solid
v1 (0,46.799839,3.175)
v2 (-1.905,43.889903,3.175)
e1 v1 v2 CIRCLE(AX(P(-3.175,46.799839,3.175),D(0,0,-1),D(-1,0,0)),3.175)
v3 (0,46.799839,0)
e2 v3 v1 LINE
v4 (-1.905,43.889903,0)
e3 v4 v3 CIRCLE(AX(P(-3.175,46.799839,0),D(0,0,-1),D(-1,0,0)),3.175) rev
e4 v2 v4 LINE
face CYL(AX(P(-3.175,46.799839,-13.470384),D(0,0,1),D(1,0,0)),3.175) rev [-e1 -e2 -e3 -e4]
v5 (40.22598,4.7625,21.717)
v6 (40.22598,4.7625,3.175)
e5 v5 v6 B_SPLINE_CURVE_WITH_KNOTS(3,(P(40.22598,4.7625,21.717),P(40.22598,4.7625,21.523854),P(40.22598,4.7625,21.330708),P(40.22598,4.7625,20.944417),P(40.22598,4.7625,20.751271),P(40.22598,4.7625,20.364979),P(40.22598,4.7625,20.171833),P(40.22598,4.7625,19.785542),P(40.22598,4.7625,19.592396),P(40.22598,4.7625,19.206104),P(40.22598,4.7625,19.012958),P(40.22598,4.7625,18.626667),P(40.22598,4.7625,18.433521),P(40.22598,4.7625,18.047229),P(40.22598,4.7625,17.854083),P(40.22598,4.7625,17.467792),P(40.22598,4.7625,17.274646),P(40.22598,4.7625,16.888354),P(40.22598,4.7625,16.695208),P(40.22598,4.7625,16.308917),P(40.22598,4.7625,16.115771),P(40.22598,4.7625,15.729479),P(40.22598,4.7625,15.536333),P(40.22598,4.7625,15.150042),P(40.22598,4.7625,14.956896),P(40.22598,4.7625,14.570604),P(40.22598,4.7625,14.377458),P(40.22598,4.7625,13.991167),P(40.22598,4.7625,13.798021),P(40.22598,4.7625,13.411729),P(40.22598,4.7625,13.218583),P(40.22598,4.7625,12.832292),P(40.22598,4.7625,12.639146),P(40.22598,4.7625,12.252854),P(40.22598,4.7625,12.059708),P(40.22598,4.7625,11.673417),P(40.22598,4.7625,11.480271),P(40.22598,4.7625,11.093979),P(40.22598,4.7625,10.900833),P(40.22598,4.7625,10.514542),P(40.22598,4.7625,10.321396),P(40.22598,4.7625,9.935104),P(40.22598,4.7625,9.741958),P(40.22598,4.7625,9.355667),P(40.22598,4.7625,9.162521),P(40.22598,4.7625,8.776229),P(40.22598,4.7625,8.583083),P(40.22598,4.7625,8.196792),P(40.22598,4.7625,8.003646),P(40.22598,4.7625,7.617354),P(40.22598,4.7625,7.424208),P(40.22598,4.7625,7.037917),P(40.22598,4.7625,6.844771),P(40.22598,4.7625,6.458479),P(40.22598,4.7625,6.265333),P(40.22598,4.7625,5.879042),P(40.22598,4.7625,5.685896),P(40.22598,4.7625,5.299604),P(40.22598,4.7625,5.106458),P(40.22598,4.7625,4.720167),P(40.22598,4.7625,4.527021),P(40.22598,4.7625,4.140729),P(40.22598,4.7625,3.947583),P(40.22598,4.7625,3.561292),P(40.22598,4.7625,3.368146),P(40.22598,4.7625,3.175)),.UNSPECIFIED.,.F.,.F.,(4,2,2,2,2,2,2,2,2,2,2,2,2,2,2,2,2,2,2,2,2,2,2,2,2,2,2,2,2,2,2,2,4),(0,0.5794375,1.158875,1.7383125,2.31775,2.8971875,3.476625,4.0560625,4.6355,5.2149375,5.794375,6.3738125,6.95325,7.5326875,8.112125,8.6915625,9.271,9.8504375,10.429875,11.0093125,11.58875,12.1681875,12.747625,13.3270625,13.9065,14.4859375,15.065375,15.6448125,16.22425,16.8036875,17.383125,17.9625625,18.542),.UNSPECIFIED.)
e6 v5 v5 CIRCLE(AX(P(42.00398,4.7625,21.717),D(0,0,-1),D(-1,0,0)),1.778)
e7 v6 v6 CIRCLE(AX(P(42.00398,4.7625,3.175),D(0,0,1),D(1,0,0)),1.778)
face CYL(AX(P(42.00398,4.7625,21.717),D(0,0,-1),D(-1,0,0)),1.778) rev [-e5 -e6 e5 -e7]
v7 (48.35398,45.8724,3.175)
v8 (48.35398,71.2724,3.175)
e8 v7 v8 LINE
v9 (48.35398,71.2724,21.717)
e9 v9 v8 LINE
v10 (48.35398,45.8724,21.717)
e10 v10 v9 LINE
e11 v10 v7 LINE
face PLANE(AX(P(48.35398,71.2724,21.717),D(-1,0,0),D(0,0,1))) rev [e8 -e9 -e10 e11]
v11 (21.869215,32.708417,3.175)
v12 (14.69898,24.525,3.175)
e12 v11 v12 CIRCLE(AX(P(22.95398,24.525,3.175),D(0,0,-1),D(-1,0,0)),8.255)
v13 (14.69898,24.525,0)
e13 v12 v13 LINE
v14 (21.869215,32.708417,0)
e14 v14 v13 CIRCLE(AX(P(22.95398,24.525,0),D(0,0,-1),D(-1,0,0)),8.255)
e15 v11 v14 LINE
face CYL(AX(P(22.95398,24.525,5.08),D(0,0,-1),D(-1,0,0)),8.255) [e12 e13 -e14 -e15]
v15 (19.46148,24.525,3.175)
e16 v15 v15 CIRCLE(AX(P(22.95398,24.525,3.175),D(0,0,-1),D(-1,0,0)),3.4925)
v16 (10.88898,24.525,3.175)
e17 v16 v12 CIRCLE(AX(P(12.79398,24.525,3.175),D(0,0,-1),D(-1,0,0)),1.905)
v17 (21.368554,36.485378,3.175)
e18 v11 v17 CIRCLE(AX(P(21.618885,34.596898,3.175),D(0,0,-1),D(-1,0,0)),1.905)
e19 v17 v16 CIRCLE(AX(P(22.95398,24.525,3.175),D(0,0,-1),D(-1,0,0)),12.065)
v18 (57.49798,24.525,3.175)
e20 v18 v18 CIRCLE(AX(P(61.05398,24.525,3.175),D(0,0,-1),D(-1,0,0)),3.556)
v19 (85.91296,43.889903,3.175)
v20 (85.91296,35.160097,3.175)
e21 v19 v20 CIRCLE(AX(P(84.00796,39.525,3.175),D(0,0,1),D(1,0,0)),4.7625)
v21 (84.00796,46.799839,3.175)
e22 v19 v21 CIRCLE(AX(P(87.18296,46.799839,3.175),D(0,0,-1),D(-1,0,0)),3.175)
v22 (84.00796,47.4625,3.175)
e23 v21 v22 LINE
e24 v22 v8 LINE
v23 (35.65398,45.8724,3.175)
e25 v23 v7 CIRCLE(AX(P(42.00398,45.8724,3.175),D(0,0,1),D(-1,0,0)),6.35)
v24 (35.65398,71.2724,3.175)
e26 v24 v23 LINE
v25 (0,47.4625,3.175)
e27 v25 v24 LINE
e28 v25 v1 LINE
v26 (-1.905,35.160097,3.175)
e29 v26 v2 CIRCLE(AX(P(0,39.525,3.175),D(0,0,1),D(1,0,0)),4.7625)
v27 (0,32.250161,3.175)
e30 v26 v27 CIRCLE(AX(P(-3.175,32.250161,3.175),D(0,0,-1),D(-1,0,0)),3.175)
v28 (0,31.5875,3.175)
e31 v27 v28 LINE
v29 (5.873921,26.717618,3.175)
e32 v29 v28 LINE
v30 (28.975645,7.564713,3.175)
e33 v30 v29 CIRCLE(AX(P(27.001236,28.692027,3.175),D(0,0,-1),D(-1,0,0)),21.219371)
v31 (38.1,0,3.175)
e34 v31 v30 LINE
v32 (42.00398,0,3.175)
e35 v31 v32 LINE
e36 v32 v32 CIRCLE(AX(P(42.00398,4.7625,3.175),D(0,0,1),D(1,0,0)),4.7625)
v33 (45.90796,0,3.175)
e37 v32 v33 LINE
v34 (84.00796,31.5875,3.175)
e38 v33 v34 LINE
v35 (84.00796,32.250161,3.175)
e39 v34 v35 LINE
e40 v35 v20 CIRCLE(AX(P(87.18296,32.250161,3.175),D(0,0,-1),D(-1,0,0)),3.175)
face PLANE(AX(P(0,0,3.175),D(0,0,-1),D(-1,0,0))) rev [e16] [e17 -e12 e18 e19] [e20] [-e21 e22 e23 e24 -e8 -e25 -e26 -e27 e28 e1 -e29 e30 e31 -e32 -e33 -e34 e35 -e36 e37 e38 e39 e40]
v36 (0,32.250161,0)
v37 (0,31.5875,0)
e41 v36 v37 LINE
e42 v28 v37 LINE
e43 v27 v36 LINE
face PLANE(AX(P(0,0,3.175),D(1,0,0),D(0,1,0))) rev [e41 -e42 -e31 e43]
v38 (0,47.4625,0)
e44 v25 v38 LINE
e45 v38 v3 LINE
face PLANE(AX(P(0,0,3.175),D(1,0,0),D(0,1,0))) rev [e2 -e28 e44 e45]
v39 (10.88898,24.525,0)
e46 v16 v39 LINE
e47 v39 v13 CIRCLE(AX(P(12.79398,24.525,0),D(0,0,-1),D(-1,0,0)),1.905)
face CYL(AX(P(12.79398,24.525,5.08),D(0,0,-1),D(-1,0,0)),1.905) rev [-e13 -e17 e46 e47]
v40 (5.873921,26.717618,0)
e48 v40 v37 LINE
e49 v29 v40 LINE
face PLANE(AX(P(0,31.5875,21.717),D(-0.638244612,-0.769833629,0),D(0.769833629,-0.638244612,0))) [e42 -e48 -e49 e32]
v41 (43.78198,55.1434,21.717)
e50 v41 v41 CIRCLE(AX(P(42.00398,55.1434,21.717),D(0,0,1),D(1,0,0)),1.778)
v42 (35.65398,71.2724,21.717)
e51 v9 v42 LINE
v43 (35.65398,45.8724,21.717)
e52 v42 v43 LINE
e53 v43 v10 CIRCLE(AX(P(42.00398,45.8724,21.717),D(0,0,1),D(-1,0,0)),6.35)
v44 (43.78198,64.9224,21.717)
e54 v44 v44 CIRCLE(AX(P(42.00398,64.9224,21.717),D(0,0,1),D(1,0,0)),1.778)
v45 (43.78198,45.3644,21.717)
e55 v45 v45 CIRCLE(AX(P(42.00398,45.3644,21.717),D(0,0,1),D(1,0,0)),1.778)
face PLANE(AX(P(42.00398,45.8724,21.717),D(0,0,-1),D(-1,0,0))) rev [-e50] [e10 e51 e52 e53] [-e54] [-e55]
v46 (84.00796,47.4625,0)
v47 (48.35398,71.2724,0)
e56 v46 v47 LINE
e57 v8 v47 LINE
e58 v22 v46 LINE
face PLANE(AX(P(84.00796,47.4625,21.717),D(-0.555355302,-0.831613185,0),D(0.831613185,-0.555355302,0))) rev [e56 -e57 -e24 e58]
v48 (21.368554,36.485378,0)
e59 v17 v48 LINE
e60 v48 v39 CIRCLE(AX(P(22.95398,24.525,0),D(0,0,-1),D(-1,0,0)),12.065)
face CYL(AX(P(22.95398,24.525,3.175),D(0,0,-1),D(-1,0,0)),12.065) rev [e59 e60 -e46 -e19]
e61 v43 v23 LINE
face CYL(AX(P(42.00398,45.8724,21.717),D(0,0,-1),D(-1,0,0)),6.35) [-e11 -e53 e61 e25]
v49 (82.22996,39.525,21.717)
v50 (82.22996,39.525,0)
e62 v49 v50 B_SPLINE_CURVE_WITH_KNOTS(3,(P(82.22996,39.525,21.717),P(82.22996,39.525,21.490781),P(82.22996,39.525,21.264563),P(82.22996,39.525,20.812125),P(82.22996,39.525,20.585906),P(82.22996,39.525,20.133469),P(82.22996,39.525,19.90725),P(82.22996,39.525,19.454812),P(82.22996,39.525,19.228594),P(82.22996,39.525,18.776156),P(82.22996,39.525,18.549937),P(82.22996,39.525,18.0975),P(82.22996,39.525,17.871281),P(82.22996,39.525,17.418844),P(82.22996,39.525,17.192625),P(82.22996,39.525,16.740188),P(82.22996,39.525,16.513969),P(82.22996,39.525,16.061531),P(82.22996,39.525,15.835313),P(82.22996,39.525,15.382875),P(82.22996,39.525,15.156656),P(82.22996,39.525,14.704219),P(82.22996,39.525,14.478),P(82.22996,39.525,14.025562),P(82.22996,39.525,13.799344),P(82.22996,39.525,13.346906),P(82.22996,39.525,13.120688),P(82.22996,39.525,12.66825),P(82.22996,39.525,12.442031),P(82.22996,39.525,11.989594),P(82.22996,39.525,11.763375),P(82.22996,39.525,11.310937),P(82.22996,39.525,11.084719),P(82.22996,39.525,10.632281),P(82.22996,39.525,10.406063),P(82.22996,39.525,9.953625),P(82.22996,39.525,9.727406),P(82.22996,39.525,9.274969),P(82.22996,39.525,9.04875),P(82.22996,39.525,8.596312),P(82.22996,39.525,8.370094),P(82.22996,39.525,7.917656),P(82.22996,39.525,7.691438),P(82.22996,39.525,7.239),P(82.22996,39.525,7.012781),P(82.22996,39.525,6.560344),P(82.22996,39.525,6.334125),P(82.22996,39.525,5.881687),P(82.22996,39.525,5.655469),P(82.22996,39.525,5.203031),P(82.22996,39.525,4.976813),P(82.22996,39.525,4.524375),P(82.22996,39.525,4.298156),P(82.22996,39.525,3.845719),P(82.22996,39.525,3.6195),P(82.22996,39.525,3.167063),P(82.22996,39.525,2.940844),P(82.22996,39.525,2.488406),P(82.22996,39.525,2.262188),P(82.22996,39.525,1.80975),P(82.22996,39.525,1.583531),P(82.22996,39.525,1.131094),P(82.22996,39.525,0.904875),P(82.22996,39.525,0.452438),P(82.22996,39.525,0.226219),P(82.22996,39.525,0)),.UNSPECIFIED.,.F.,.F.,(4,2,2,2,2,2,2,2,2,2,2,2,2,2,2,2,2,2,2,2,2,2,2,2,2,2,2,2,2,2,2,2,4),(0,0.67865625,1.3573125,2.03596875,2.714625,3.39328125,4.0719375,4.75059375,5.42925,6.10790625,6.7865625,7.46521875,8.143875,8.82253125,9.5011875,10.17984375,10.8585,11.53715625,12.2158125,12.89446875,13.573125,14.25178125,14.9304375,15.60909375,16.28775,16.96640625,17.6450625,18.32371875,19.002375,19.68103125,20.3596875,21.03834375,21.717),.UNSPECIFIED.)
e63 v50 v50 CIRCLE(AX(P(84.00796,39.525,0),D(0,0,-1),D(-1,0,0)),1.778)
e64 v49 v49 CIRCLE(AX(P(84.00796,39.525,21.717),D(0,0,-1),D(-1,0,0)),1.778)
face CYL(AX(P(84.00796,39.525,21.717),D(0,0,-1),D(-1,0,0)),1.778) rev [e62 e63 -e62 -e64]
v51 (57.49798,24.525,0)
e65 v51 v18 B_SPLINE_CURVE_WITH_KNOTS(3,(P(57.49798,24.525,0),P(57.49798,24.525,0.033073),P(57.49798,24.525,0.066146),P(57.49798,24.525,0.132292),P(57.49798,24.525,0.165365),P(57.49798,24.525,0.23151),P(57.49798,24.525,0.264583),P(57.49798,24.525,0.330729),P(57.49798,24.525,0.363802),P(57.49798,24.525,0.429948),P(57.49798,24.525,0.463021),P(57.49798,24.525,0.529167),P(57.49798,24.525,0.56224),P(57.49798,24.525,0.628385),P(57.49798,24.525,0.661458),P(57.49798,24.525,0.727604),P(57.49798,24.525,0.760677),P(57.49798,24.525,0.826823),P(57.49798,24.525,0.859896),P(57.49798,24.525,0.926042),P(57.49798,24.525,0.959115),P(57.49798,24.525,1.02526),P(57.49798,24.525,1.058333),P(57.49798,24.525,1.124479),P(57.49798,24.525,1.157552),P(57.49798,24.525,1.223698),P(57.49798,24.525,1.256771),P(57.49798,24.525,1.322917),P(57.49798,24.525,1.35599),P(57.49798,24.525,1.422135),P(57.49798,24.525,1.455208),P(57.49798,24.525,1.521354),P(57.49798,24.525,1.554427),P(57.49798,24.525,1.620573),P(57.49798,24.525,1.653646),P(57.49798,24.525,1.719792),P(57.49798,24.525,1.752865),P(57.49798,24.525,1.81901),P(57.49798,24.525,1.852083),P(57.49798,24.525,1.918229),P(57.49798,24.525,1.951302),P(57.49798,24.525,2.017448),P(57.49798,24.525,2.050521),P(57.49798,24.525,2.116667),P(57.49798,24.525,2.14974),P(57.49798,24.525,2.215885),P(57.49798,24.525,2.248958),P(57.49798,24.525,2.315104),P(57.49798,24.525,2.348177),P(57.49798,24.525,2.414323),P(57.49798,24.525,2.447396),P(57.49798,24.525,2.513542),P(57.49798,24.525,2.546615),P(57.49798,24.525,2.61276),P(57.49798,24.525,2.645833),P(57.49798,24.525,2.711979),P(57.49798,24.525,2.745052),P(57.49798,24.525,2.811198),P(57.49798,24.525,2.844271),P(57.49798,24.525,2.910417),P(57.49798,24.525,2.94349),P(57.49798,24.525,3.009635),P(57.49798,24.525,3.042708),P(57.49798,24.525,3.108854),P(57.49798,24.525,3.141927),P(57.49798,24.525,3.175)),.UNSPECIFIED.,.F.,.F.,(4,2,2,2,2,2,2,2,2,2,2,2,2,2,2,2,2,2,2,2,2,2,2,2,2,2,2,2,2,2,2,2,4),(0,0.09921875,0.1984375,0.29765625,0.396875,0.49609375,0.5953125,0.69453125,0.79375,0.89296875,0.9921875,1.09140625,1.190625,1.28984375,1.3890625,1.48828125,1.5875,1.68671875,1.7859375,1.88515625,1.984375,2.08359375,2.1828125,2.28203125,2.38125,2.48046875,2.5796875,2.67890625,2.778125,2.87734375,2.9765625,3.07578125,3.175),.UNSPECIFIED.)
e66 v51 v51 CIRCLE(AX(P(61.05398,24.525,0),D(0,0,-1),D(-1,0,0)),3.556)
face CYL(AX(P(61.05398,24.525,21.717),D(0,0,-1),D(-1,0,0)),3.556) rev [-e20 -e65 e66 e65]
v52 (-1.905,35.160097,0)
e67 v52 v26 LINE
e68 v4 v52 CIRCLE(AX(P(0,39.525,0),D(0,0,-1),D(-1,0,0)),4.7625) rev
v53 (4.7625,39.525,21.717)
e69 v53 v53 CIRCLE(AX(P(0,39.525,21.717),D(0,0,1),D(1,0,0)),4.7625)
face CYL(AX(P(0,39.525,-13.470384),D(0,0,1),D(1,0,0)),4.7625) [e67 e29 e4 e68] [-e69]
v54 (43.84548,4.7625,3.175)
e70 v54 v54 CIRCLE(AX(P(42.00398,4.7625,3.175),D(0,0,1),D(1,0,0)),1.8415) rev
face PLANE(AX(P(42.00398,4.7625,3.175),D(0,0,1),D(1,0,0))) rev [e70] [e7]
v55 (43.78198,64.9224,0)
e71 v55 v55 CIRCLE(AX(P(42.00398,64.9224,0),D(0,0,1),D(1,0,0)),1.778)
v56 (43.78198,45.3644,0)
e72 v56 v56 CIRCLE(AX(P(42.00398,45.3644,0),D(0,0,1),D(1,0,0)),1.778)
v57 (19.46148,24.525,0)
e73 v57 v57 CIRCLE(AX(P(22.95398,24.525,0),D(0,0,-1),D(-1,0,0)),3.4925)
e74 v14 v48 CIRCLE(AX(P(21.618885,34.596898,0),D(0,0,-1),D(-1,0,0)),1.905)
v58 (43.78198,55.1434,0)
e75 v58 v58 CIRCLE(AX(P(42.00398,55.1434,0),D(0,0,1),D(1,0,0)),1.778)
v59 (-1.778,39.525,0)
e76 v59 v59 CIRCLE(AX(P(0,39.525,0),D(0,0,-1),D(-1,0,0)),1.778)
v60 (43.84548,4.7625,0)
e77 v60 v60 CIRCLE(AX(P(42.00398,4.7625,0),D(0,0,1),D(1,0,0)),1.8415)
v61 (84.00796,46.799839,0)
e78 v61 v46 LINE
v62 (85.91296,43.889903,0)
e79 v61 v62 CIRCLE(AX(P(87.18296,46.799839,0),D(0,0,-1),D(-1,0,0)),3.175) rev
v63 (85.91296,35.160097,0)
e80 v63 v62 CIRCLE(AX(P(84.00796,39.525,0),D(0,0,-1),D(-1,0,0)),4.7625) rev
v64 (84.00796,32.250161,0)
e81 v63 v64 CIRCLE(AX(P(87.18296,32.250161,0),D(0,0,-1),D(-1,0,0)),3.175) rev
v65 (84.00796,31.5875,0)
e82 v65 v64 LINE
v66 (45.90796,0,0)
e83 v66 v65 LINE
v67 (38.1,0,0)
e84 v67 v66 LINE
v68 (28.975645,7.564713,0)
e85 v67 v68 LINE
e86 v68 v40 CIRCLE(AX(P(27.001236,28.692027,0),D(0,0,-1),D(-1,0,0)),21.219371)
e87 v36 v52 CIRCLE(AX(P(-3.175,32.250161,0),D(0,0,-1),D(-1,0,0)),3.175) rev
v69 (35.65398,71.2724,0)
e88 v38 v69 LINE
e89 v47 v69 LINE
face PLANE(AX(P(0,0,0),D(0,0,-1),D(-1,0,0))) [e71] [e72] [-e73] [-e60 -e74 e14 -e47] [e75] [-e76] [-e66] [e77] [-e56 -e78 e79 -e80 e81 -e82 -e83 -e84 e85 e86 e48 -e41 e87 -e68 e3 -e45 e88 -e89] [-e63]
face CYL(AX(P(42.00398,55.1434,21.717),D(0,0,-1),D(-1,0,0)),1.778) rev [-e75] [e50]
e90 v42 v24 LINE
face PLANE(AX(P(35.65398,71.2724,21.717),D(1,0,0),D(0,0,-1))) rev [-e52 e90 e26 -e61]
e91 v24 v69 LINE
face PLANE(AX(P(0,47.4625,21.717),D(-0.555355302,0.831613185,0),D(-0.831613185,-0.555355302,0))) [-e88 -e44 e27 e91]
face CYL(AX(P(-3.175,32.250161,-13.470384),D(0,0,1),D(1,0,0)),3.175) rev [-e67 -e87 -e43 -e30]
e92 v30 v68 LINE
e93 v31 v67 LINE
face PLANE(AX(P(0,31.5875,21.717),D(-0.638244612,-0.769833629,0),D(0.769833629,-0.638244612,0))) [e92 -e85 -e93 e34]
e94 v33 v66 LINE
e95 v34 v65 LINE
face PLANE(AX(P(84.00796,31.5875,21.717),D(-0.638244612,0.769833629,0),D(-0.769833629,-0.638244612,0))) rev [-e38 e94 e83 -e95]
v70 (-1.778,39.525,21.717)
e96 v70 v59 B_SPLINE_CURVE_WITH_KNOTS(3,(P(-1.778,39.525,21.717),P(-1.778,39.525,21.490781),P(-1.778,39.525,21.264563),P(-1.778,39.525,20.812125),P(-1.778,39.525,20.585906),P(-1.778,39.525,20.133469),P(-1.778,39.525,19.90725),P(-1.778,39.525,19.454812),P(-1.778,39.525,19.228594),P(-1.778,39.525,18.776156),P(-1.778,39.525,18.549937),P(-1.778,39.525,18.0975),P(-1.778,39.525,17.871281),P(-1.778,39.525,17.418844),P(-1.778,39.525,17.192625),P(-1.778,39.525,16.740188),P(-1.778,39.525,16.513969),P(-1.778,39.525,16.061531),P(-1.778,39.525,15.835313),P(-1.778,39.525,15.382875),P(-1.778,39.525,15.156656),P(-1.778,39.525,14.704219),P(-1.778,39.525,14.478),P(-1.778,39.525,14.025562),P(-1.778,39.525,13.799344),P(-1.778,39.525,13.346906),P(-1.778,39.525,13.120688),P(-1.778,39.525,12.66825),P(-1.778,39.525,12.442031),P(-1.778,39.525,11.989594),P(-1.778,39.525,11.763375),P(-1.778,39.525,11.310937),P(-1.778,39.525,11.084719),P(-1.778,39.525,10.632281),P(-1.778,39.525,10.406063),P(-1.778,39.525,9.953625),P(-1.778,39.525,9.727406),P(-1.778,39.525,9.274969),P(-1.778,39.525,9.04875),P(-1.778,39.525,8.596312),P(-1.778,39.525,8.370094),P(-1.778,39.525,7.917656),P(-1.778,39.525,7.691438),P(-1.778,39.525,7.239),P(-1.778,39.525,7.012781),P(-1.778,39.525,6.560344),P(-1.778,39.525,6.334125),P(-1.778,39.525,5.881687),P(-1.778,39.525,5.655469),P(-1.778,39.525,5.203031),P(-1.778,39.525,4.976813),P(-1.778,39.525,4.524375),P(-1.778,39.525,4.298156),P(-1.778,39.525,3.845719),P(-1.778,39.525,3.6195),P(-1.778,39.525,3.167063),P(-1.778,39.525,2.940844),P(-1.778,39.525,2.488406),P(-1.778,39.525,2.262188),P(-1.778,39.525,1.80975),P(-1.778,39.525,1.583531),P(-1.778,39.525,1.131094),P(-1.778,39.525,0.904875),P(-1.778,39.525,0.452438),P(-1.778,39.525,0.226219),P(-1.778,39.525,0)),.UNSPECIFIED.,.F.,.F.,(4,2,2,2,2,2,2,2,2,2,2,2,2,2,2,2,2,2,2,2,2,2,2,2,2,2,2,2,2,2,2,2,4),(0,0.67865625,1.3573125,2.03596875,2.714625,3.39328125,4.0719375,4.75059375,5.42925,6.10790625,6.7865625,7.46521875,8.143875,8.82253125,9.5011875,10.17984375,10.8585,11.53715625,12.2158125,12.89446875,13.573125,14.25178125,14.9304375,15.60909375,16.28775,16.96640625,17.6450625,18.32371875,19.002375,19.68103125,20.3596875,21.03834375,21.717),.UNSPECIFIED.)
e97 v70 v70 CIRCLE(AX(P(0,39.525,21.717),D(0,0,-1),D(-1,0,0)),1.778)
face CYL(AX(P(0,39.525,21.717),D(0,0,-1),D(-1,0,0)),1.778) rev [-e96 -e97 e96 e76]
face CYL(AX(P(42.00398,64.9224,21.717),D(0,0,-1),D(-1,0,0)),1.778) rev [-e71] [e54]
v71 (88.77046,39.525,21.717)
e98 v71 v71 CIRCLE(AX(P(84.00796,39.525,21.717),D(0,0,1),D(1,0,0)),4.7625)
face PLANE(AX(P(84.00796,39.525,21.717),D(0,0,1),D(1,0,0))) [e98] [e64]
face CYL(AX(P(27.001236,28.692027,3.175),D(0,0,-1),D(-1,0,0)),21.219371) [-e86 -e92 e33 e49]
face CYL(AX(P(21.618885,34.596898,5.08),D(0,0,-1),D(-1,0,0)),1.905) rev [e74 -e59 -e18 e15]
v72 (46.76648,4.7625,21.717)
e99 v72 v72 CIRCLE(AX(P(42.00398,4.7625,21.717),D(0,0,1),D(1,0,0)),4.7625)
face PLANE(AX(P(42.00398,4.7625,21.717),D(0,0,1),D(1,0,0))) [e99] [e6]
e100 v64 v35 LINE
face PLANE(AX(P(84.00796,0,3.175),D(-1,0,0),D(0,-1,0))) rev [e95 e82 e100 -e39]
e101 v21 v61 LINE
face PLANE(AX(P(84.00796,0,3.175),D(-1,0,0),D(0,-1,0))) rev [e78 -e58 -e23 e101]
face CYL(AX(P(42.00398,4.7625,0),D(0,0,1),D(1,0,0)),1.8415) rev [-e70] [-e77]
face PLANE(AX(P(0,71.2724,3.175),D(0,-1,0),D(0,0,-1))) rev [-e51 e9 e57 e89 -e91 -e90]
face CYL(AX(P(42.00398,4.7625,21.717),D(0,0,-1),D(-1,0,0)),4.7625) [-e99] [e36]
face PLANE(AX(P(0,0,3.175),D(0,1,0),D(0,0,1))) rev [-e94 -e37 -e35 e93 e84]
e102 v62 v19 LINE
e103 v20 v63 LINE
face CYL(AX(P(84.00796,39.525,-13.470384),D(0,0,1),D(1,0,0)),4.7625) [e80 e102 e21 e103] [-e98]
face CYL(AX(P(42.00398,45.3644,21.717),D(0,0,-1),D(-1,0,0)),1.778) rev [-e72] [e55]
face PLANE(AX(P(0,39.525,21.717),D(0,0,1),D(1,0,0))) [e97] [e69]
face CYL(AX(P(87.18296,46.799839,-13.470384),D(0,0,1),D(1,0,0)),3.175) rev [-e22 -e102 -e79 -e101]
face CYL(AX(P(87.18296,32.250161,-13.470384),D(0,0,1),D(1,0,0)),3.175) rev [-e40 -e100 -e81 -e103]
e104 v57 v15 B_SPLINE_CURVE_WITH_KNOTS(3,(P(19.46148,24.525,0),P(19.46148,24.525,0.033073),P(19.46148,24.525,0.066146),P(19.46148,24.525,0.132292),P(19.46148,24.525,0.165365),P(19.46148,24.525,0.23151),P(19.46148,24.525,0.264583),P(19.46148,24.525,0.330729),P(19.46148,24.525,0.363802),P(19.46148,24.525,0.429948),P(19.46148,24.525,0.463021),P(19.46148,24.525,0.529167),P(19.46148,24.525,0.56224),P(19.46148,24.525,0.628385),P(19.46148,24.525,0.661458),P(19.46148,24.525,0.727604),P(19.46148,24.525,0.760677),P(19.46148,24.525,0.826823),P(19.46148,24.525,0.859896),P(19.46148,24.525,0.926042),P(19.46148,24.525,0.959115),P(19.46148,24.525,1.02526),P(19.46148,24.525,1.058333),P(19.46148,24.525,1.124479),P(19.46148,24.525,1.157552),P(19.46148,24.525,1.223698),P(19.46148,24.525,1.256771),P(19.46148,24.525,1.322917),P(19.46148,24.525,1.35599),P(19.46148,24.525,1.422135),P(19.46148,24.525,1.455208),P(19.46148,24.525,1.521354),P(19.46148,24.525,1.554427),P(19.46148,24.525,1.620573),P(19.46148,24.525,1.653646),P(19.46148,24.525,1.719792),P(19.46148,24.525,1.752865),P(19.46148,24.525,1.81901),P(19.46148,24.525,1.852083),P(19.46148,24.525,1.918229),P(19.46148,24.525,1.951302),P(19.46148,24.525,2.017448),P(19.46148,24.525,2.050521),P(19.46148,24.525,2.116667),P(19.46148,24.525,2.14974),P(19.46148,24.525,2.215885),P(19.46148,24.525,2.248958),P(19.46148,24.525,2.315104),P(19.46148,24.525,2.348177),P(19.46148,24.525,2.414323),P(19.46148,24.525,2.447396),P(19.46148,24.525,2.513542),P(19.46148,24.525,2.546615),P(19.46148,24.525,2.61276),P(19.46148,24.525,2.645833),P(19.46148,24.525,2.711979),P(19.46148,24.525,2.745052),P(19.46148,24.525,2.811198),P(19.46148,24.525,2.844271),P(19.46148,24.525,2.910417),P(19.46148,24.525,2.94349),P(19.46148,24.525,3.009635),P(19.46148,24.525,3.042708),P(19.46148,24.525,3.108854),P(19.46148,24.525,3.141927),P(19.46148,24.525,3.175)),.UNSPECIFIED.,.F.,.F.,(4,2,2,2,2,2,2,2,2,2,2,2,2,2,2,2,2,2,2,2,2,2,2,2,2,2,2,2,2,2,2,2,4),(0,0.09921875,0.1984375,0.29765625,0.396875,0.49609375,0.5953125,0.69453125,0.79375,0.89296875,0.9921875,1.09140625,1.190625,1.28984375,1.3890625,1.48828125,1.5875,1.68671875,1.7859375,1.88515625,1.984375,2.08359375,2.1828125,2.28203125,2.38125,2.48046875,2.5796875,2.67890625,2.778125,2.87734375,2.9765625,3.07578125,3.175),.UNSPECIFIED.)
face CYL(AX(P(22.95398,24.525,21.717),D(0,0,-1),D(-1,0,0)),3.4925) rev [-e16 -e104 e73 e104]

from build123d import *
from build123d.topology import SkipClean

# Parameters (mm, degrees)
SKETCH1_W               = 84.00796
SKETCH1_H               = 71.2724
BOSS_EXTRUDE1_DEPTH     = 3.175
SKETCH5_R               = 4.7625
BOSS_EXTRUDE3_DEPTH     = 3.175
SKETCH3_R               = 1.8415
CUT_EXTRUDE1_DEPTH      = 114.886040389
BOSS_EXTRUDE4_START     = 18.542
SKETCH6_R               = 4.7625
BOSS_EXTRUDE4_DEPTH     = 18.542
CUT_EXTRUDE2_DEPTH      = 116.341906237
CUT_EXTRUDE2_DEPTH_BACK = 116.341906237
SKETCH4_R               = 1.778
SKETCH7_R               = 1.778
CUT_EXTRUDE3_DEPTH      = 116.894683482
SKETCH8_R               = 3.556
SKETCH8_R_2             = 3.4925
CUT_EXTRUDE4_DEPTH      = 116.894683482
CUT_EXTRUDE5_DEPTH      = 116.894683482
FILLET1_R               = 3.175
BOSS_EXTRUDE5_DEPTH     = 3.175
CUT_EXTRUDE7_DEPTH      = 5.08


with BuildPart() as part:
    # Sketch1 → Boss-Extrude1 (new body)
    with BuildSketch(Plane.XY):
        with Locations((42.00398, 35.6362)):
            Rectangle(SKETCH1_W, SKETCH1_H)
    extrude(amount=BOSS_EXTRUDE1_DEPTH)

    # Sketch5 → Boss-Extrude3 (add)
    with BuildSketch(Plane.XY.offset(3.175)):
        with Locations((84.00796, 39.524999944)):
            Circle(SKETCH5_R)
        with Locations((0, 39.524999944)):
            Circle(SKETCH5_R)
    extrude(amount=-BOSS_EXTRUDE3_DEPTH)

    # Sketch3 → Cut-Extrude1 (cut, through all)
    with BuildSketch(Plane.XY.offset(3.175)):
        with Locations((42.00398, 4.7625)):
            Circle(SKETCH3_R)
    extrude(amount=-CUT_EXTRUDE1_DEPTH, mode=Mode.SUBTRACT)

    # Sketch6 → Boss-Extrude4 (add)
    with BuildSketch(Plane.XY.offset(3.175).offset(BOSS_EXTRUDE4_START)):
        with Locations((84.00796, 39.524999944)):
            Circle(SKETCH6_R)
        with Locations((0, 39.524999944)):
            Circle(SKETCH6_R)
        with Locations(Location((42.00398, 4.7625, 0), (0, 0, 270))):
            Circle(SKETCH6_R)
        with BuildLine():
            Line((35.65398, 71.2724), (48.35398, 71.2724))
            Line((48.35398, 71.2724), (48.35398, 45.8724))
            ThreePointArc((48.35398, 45.8724), (42.00398, 39.5224), (35.65398, 45.8724))
            Line((35.65398, 45.8724), (35.65398, 71.2724))
        make_face()
    extrude(amount=-BOSS_EXTRUDE4_DEPTH)

    # Sketch4 → Cut-Extrude2 (cut, two sides: drawn at the far end of the back side and taken through both)
    with BuildSketch(Plane.XY.offset(3.175).offset(-CUT_EXTRUDE2_DEPTH_BACK)):
        with Locations((42.00398, 64.9224)):
            Circle(SKETCH4_R)
        with Locations((42.00398, 55.1434)):
            Circle(SKETCH4_R)
        with Locations((42.00398, 45.3644)):
            Circle(SKETCH4_R)
    extrude(amount=CUT_EXTRUDE2_DEPTH + CUT_EXTRUDE2_DEPTH_BACK, mode=Mode.SUBTRACT)

    # Sketch7 → Cut-Extrude3 (cut, through all)
    with BuildSketch(Plane(origin=(0, 0, 0), x_dir=(-1, 0, 0), z_dir=(0, 0, -1))):
        with Locations((-42.00398, 4.7625)):
            Circle(SKETCH7_R)
        with Locations((0, 39.524999944)):
            Circle(SKETCH7_R)
        with Locations((-84.00796, 39.524999944)):
            Circle(SKETCH7_R)
    extrude(amount=-CUT_EXTRUDE3_DEPTH, mode=Mode.SUBTRACT)

    # Sketch8 → Cut-Extrude4 (cut, through all)
    with BuildSketch(Plane(origin=(0, 0, 0), x_dir=(-1, 0, 0), z_dir=(0, 0, -1))):
        with Locations((-61.05398, 24.524999972)):
            Circle(SKETCH8_R)
        with Locations((-22.95398, 24.524999972)):
            Circle(SKETCH8_R_2)
    extrude(amount=-CUT_EXTRUDE4_DEPTH, mode=Mode.SUBTRACT)

    # Sketch9 → Cut-Extrude5 (cut, through all)
    with BuildSketch(Plane(origin=(0, 0, 0), x_dir=(-1, 0, 0), z_dir=(0, 0, -1))):
        Polygon((-84.00796, 0), (-84.00796, 31.587499944), (-45.90796, 0), align=None)
        Polygon((-84.00796, 71.2724), (-84.00796, 47.462499944), (-48.35398, 71.2724), align=None)
    cut_extrude5 = extrude(amount=-CUT_EXTRUDE5_DEPTH, mode=Mode.SUBTRACT)

    # Mirror1: Cut-Extrude5 across plane
    add(cut_extrude5.mirror(Plane(origin=(42.00398, 0, 0), x_dir=(0, 0, 1), z_dir=(1, 0, 0))), mode=Mode.SUBTRACT)

    # Fillet1
    # the kernel refuses this fillet: 3.175 mm, written as the material it adds along each edge
    with BuildSketch(Plane(origin=(84.00796, 34.762499944, 0), x_dir=(0.9789063129307042, 0.2043096436892158, 0), z_dir=(0, 0, 1))) as fillet1_piece_1:
        with BuildLine():
            CenterArc((2.594732475, -3.108027544), FILLET1_R, 101.789089239, 66.421821522)
            Line((-0.513295069, -2.459344425), (0, 0))
            ThreePointArc((0, 0), (0.973024678, -0.100458685), (1.946049356, 0))
        make_face()
    extrude(amount=3.175)
    with BuildSketch(Plane(origin=(84.00796, 44.287499944, 0), x_dir=(0, 1, 0), z_dir=(0, 0, 1)), Plane(origin=(0, 34.762499944, 0), x_dir=(0, -1, 0), z_dir=(0, 0, 1))) as fillet1_piece_2:
        with BuildLine():
            CenterArc((2.512338916, -3.175), FILLET1_R, 90, 66.421821522)
            ThreePointArc((-0.397596651, -1.905), (-0.100458685, -0.973024678), (0, 0))
            Line((0, 0), (2.512338916, 0))
        make_face()
    extrude(amount=3.175)
    with BuildSketch(Plane(origin=(0, 44.287499944, 0), x_dir=(0, 1, 0), z_dir=(0, 0, 1))) as fillet1_piece_3:
        with BuildLine():
            CenterArc((2.512338916, 3.175), FILLET1_R, 203.578178478, 66.421821522)
            ThreePointArc((-0.397596651, 1.905), (-0.100458685, 0.973024678), (0, 0))
            Line((0, 0), (2.512338916, 0))
        make_face()
    extrude(amount=3.175)

    # Sketch10 → Boss-Extrude5 (add)
    with BuildSketch(Plane(origin=(0, 0, 0), x_dir=(-1, 0, 0), z_dir=(0, 0, -1))):
        with BuildLine():
            Line((-23.070402794, 12.460561704), (-28.975644685, 7.564713202))
            ThreePointArc((-28.975644685, 7.564713202), (-13.458086548, 12.356642178), (-5.873921435, 26.717618238))
            Line((-5.873921435, 26.717618238), (-11.078476776, 22.402686701))
            ThreePointArc((-11.078476776, 22.402686701), (-11.084404387, 22.364145909), (-11.091119617, 22.325734519))
            ThreePointArc((-11.091119617, 22.325734519), (-15.284227222, 15.211616198), (-23.070402794, 12.460561704))
        make_face()
    extrude(amount=-BOSS_EXTRUDE5_DEPTH)

    # Sketch11 → Cut-Extrude7 (cut)
    with SkipClean():  # the faces are left unmerged after this step: merging them gives an invalid solid
        with BuildSketch(Plane(origin=(0, 0, 0), x_dir=(-1, 0, 0), z_dir=(0, 0, -1))):
            with BuildLine():
                ThreePointArc((-25.8996445, 32.236555305), (-24.799823539, 34.695913728), (-27.259181962, 35.795734689))
                ThreePointArc((-27.259181962, 35.795734689), (-34.829175406, 22.39334356), (-23.070402794, 12.460561704))
                Line((-23.070402794, 12.460561704), (-11.078476776, 22.402686701))
                ThreePointArc((-11.078476776, 22.402686701), (-11.084404387, 22.364145909), (-11.091119617, 22.325734519))
                ThreePointArc((-11.091119617, 22.325734519), (-10.939621184, 23.420732233), (-10.88898, 24.524999972))
                ThreePointArc((-10.88898, 24.524999972), (-12.79398, 26.429999972), (-14.69898, 24.524999972))
                ThreePointArc((-14.69898, 24.524999972), (-27.635249302, 17.725680688), (-25.8996445, 32.236555305))
            make_face()
            with BuildLine():
                ThreePointArc((-21.368554277, 36.485378322), (-24.356904724, 36.508155951), (-27.259181962, 35.795734689))
                ThreePointArc((-27.259181962, 35.795734689), (-24.799823539, 34.695913728), (-25.8996445, 32.236555305))
                ThreePointArc((-25.8996445, 32.236555305), (-23.913875864, 32.724001431), (-21.869215031, 32.708416738))
                ThreePointArc((-21.869215031, 32.708416738), (-19.730403862, 34.346567153), (-21.368554277, 36.485378322))
            make_face()
        extrude(amount=-CUT_EXTRUDE7_DEPTH, mode=Mode.SUBTRACT)


solid = part.part
